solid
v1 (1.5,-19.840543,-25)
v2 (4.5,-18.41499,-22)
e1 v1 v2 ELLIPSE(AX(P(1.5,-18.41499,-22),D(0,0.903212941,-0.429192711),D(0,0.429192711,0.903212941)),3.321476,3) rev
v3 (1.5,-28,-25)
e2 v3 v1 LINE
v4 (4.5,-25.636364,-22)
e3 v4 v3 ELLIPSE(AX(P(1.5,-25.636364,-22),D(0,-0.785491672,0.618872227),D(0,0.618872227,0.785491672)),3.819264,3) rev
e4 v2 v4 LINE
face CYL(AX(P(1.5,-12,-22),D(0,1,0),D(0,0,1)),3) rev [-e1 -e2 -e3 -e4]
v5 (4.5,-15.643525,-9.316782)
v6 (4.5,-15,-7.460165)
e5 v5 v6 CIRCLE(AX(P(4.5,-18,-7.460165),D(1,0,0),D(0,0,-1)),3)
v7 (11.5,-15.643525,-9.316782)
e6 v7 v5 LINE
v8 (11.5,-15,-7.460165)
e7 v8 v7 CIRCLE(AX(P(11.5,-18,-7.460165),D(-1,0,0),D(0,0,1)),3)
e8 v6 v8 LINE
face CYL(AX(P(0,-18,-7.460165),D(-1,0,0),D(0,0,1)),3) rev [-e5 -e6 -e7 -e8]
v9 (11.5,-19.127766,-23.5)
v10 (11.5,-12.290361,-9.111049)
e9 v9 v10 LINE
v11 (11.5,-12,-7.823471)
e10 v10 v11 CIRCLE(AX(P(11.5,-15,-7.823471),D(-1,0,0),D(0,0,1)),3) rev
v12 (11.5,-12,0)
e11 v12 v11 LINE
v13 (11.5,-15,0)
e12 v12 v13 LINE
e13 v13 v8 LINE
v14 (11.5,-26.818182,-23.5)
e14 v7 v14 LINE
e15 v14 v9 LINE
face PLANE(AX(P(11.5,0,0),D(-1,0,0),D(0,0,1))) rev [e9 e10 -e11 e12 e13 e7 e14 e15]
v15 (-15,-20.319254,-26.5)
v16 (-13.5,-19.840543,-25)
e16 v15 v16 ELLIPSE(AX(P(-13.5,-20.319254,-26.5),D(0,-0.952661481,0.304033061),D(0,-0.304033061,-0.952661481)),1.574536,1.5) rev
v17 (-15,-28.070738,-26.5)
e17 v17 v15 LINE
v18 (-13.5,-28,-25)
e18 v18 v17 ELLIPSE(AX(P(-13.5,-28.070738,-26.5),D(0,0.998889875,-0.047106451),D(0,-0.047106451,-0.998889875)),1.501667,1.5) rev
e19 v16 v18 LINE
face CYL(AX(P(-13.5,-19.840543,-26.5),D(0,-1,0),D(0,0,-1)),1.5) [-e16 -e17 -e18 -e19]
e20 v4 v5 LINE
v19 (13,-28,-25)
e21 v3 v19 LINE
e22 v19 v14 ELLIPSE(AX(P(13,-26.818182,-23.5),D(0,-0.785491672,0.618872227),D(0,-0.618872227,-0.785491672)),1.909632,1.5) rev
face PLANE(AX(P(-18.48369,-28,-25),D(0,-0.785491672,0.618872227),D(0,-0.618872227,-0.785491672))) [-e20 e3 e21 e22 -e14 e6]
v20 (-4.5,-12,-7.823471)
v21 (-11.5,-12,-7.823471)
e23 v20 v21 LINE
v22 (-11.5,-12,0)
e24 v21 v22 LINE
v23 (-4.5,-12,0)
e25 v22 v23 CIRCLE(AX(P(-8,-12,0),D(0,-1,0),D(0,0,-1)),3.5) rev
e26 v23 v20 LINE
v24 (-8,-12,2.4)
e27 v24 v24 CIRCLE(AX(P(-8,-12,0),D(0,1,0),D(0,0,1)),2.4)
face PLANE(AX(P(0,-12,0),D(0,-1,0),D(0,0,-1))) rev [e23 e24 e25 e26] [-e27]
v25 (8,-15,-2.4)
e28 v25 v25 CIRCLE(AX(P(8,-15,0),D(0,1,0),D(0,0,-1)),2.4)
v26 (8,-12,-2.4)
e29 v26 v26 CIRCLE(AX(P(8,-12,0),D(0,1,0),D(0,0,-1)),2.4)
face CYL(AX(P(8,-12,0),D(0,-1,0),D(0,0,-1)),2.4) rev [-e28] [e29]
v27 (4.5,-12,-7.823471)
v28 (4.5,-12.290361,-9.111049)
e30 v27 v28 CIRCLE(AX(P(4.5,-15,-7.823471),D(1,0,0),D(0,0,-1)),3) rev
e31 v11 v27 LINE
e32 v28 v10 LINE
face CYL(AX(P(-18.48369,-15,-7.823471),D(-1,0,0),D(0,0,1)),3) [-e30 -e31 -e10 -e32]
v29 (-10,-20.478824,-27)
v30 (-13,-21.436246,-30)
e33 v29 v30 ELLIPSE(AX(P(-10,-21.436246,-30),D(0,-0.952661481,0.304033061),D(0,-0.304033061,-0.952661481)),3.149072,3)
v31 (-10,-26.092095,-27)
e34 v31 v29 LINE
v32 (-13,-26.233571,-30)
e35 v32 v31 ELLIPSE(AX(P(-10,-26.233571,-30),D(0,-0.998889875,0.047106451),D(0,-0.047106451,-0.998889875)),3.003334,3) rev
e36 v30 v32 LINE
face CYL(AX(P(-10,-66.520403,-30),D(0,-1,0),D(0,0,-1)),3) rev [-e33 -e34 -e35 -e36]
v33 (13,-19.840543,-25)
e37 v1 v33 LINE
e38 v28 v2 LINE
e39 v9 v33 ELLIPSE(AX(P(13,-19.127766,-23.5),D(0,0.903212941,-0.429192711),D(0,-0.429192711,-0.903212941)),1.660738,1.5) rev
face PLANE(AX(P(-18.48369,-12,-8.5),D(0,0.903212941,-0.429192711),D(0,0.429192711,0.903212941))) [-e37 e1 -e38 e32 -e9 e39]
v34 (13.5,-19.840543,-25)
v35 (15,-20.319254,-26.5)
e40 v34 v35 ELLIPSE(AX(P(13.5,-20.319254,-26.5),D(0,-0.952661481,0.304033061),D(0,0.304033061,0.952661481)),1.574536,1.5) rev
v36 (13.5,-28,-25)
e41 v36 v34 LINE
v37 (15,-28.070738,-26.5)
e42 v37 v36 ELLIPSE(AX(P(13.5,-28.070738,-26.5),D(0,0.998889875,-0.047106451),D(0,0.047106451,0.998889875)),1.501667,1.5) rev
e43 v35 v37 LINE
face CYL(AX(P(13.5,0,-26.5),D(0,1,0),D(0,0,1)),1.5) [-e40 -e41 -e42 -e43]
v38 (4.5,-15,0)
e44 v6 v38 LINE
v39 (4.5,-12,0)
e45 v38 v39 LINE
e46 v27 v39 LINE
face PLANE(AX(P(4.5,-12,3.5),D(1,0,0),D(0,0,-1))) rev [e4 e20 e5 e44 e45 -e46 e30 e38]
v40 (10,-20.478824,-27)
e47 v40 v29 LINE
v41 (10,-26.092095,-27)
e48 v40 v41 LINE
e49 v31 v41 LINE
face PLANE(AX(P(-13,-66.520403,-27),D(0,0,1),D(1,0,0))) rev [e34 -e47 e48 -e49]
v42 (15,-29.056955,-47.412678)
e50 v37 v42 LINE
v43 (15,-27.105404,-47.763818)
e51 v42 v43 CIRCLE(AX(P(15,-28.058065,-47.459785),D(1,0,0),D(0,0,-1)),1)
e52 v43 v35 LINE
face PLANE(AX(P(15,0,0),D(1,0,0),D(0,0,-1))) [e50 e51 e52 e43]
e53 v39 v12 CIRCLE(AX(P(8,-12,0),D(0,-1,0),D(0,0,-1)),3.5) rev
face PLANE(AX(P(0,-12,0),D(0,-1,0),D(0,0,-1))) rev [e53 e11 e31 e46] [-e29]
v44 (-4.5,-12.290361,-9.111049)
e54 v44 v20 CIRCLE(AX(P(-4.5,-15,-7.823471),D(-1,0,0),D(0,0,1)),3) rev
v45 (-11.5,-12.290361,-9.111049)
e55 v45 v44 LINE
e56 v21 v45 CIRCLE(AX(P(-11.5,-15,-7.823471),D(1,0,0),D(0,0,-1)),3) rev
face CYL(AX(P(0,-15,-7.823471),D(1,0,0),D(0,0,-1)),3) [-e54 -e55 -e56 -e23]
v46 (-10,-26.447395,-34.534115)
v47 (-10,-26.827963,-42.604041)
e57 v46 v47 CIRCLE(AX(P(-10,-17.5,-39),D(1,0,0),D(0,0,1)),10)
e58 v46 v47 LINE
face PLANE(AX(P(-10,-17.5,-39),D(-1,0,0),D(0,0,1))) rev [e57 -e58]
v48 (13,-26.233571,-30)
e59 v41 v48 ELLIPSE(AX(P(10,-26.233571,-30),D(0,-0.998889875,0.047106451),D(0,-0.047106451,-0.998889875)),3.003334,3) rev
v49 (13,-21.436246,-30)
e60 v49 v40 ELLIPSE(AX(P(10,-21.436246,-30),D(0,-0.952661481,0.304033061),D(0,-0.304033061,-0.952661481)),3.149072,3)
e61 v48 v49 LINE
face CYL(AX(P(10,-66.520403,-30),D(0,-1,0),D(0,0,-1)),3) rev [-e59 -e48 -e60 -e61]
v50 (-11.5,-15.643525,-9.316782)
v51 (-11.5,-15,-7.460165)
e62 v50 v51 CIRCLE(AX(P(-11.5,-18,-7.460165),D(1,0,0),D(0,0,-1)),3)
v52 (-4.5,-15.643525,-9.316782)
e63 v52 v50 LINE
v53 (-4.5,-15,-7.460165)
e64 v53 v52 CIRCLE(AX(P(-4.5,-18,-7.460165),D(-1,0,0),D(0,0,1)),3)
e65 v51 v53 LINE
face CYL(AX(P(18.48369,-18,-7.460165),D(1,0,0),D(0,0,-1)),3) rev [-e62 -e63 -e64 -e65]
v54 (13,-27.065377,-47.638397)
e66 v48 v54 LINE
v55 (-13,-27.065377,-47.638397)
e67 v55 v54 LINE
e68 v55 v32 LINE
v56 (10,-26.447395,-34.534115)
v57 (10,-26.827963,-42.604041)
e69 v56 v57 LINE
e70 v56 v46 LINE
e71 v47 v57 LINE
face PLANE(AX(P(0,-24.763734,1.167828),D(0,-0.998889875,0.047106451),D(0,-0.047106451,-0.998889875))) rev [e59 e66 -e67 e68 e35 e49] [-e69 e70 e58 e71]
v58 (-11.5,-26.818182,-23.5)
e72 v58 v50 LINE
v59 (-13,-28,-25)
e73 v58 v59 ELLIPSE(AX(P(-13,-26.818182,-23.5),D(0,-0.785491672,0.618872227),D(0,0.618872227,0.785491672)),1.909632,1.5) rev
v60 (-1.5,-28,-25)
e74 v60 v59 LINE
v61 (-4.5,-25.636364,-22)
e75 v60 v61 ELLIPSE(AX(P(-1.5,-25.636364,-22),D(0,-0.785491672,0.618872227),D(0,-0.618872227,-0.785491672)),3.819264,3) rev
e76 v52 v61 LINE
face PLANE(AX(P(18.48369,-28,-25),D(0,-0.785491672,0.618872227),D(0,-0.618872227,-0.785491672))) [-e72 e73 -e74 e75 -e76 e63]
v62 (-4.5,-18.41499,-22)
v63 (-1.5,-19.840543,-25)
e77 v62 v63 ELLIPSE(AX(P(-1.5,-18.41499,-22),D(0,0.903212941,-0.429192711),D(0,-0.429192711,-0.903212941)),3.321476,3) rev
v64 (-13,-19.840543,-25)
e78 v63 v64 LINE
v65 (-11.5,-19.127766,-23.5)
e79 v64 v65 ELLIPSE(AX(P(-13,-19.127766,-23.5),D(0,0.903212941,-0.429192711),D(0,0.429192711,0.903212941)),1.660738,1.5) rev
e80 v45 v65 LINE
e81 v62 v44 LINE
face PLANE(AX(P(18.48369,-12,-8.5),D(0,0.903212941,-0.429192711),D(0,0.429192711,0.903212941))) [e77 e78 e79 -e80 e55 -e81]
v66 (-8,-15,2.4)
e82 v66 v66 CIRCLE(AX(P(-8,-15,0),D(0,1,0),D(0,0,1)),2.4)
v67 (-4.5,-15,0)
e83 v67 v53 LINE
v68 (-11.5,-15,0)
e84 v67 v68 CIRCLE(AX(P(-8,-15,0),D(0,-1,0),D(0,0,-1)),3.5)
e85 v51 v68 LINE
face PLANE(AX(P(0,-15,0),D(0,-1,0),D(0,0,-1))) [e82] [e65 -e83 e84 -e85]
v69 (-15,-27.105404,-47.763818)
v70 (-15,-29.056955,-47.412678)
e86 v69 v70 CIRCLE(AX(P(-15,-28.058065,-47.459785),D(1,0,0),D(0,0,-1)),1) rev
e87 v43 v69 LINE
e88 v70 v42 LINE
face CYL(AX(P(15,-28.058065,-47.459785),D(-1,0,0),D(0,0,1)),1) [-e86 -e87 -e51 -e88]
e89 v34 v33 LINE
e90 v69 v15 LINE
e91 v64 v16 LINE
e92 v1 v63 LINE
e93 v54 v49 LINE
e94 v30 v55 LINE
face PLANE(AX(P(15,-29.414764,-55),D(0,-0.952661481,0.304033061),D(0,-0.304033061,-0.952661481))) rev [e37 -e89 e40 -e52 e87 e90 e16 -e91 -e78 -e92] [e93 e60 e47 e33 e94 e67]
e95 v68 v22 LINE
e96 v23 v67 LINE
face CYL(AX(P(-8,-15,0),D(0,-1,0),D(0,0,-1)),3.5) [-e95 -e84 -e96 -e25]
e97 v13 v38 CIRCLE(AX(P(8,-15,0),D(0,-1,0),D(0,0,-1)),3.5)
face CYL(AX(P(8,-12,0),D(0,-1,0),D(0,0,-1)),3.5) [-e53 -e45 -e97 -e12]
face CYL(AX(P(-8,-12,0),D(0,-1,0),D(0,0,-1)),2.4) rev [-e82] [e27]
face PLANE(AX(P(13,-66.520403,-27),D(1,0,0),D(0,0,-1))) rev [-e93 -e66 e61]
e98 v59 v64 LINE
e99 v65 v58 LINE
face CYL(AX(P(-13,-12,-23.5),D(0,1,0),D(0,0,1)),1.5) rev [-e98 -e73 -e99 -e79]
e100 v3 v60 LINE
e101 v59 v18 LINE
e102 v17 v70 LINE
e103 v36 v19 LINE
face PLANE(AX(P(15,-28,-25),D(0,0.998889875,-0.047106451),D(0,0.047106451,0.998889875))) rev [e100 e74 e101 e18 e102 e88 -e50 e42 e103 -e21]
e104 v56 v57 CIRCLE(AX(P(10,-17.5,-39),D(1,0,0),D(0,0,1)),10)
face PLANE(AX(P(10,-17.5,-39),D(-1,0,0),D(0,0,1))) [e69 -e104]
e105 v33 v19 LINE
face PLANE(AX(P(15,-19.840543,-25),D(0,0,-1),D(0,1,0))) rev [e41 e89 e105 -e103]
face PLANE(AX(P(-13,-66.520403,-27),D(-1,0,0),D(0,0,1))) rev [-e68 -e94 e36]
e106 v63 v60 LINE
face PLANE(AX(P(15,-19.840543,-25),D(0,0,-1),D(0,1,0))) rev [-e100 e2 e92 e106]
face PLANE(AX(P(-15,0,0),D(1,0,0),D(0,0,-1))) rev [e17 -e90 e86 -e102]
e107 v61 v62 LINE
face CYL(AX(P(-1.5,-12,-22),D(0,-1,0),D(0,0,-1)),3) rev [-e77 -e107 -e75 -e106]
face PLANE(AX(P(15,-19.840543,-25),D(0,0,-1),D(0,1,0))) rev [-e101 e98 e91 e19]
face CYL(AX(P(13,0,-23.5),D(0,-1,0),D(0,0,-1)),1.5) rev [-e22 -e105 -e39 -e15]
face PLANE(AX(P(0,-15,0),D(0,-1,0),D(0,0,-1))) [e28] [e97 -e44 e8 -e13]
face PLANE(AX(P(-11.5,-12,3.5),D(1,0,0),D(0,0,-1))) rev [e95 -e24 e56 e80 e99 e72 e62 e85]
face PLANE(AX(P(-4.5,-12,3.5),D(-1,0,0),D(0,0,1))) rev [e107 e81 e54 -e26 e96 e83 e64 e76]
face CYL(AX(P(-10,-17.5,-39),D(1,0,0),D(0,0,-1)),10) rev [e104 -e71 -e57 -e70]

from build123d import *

# Parameters (mm, degrees)
BOSS_EXTRUDE1_DEPTH   = 15
CUT_EXTRUDE1_REACH    = 66.15
SKETCH2_W             = 26
SKETCH2_H             = 30
SKETCH4_W             = 7
SKETCH4_H             = 12
SKETCH4_R             = 2.4
BOSS_EXTRUDE2_DEPTH   = 1.5
BOSS_EXTRUDE2_2_DEPTH = 1.5
BOSS_EXTRUDE3_DEPTH   = 7
BOSS_EXTRUDE4_DEPTH   = 7
FILLET1_R             = 3
FILLET2_R             = 1.5
FILLET3_R             = 1
FILLET4_RADIUS        = 3.5
FILLET4_LENGTH        = 3
FILLET5_RADIUS        = 3.5
FILLET5_LENGTH        = 3
SKETCH3_R             = 10
CUT_EXTRUDE2_DEPTH    = 10


with BuildPart() as part:
    # Sketch1 → Boss-Extrude1 (new, symmetric)
    with BuildSketch(Plane(origin=(0, 0, 0), x_dir=(0, 0, -1), z_dir=(1, 0, 0))):
        Polygon((25, -19.840542805), (25, -28), (55, -29.414764086), align=None)
    extrude(amount=BOSS_EXTRUDE1_DEPTH, both=True)

    # Cut-Extrude1: up to this plane
    cut_extrude1_end = Plane(origin=(0, -24.763733838, 1.167828043), z_dir=(0, -0.99888987496197, 0.0471064507096427))
    # Sketch2 → Cut-Extrude1 (cut, up to the surface)
    with BuildSketch(Plane(origin=(0, 0, 0), x_dir=(1, 0, 0), z_dir=(0, 1, 0)), mode=Mode.PRIVATE) as cut_extrude1_sk1:
        with Locations((0, 42)):
            Rectangle(SKETCH2_W, SKETCH2_H)
    cut_extrude1_tool1 = split(extrude(cut_extrude1_sk1.sketch, amount=-CUT_EXTRUDE1_REACH, mode=Mode.PRIVATE), bisect_by=cut_extrude1_end, keep=Keep.BOTH, mode=Mode.PRIVATE)
    add(cut_extrude1_tool1.solids().sort_by_distance((0, 0, -42))[0], mode=Mode.SUBTRACT)



with BuildPart() as body_2:
    # Sketch4 → Boss-Extrude2 (new, symmetric)
    with BuildSketch(Plane(origin=(0, -13.5, 0), x_dir=(1, 0, 0), z_dir=(0, 1, 0))):
        with Locations((8, 2.5)):
            Rectangle(SKETCH4_W, SKETCH4_H)
        with Locations(Location((8, 0, 0), (0, 0, 90))):
            Circle(SKETCH4_R, mode=Mode.SUBTRACT)
    extrude(amount=BOSS_EXTRUDE2_DEPTH, both=True)


with BuildPart() as body_3:
    # Sketch4 → Boss-Extrude2 2 (new, symmetric)
    with BuildSketch(Plane(origin=(0, -13.5, 0), x_dir=(1, 0, 0), z_dir=(0, 1, 0))):
        with Locations((-8, 2.5)):
            Rectangle(SKETCH4_W, SKETCH4_H)
        with Locations(Location((-8, 0, 0), (0, 0, 270))):
            Circle(SKETCH4_R, mode=Mode.SUBTRACT)
    extrude(amount=BOSS_EXTRUDE2_2_DEPTH, both=True)


with BuildPart() as part_1:
    add(part.part)

    add(body_2.part)  # Boss-Extrude3 merges body 2
    # Sketch5 → Boss-Extrude3 (add)
    with BuildSketch(Plane(origin=(11.5, 0, 0), x_dir=(0, 0, -1), z_dir=(1, 0, 0))):
        Polygon((8.5, -12), (8.5, -15), (25, -28), (25, -19.840542805), align=None)
    extrude(amount=-BOSS_EXTRUDE3_DEPTH)


    add(body_3.part)  # Boss-Extrude4 merges body 3
    # Sketch8 → Boss-Extrude4 (add)
    with BuildSketch(Plane.ZY.offset(11.5)):
        Polygon((-25, -28), (-8.5, -15), (-8.5, -12), (-25, -19.840542805), align=None)
    extrude(amount=-BOSS_EXTRUDE4_DEPTH)

    # Fillet1
    fillet1_edges = [part_1.edges().sort_by_distance(p)[0] for p in [
        (-8, -12, -8.5),
        (-4.5, -23.920271402, -25),
        (-13, -23.285459556, -27),
        (13, -23.285459556, -27),
        (8, -12, -8.5),
        (4.5, -23.920271402, -25),
        (8, -15, -8.5),
        (-8, -15, -8.5),
    ]]
    fillet(fillet1_edges, radius=FILLET1_R)

    # Fillet2
    # the kernel refuses this fillet: 1.5 mm, written as the material it adds along each edge
    with BuildSketch(Plane(origin=(-11.5, -16.090542805, -25), x_dir=(0, 0, 1), z_dir=(0, -1, 0))) as fillet2_piece_1_section:
        with BuildLine():
            CenterArc((FILLET2_R, FILLET2_R), FILLET2_R, 180, 90)
            Line((0, FILLET2_R), (0, 0))
            Line((0, 0), (FILLET2_R, 0))
        make_face()
    fillet2_piece_1 = extrude(amount=15.659457195, mode=Mode.PRIVATE)
    fillet2_piece_1 = split(fillet2_piece_1, bisect_by=Plane(origin=(-11.659708769, -19.629987495, -24.340243021), z_dir=(0, 0.9526614812535883, -0.30403306092548404)), keep=Keep.TOP, mode=Mode.PRIVATE)
    fillet2_piece_1 = split(fillet2_piece_1, bisect_by=Plane(origin=(-11.659708769, -19.543237279, -24.374336535), z_dir=(0, -0.9032129411473199, 0.4291927107302828)), keep=Keep.TOP, mode=Mode.PRIVATE)
    add(fillet2_piece_1)
    with BuildSketch(Plane(origin=(-11.5, -16.090542805, -25), x_dir=(0, 0, 1), z_dir=(0, -1, 0))) as fillet2_piece_2_section:
        with BuildLine():
            CenterArc((FILLET2_R, FILLET2_R), FILLET2_R, 180, 90)
            Line((0, FILLET2_R), (0, 0))
            Line((0, 0), (FILLET2_R, 0))
        make_face()
    fillet2_piece_2 = extrude(amount=15.659457195, mode=Mode.PRIVATE)
    fillet2_piece_2 = split(fillet2_piece_2, bisect_by=Plane(origin=(-11.843159529, -20.103961016, -25.825398338), z_dir=(0, -0.9526614812535883, 0.30403306092548404)), keep=Keep.TOP, mode=Mode.PRIVATE)
    fillet2_piece_2 = split(fillet2_piece_2, bisect_by=Plane(origin=(-11.843159529, -20.428696748, -26.237738291), z_dir=(0, -0.9032129411473199, 0.4291927107302828)), keep=Keep.TOP, mode=Mode.PRIVATE)
    fillet2_piece_2 = split(fillet2_piece_2, bisect_by=Plane(origin=(-11.843159529, -26.204484919, -22.721077013), z_dir=(0, 0.7854916722275349, -0.6188722266035137)), keep=Keep.TOP, mode=Mode.PRIVATE)
    fillet2_piece_2 = split(fillet2_piece_2, bisect_by=Plane(origin=(-11.843159529, -27.974843393, -24.466555432), z_dir=(0, 0.99888987496197, -0.04710645070964269)), keep=Keep.TOP, mode=Mode.PRIVATE)
    add(fillet2_piece_2)
    with BuildSketch(Plane(origin=(11.5, -31.75, -25), x_dir=(1, 0, 0), z_dir=(0, 1, 0))) as fillet2_piece_3_section:
        with BuildLine():
            CenterArc((FILLET2_R, -FILLET2_R), FILLET2_R, 90, 90)
            Line((0, -FILLET2_R), (0, 0))
            Line((0, 0), (FILLET2_R, 0))
        make_face()
    fillet2_piece_3 = extrude(amount=15.659457195, mode=Mode.PRIVATE)
    fillet2_piece_3 = split(fillet2_piece_3, bisect_by=Plane(origin=(11.843159529, -20.103961016, -25.825398338), z_dir=(0, -0.9526614812535883, 0.30403306092548404)), keep=Keep.TOP, mode=Mode.PRIVATE)
    fillet2_piece_3 = split(fillet2_piece_3, bisect_by=Plane(origin=(11.843159529, -27.974843393, -24.466555432), z_dir=(0, 0.99888987496197, -0.04710645070964269)), keep=Keep.TOP, mode=Mode.PRIVATE)
    fillet2_piece_3 = split(fillet2_piece_3, bisect_by=Plane(origin=(11.843159529, -26.204484919, -22.721077013), z_dir=(0, 0.7854916722275349, -0.6188722266035137)), keep=Keep.TOP, mode=Mode.PRIVATE)
    fillet2_piece_3 = split(fillet2_piece_3, bisect_by=Plane(origin=(11.843159529, -20.428696748, -26.237738291), z_dir=(0, -0.9032129411473199, 0.4291927107302828)), keep=Keep.TOP, mode=Mode.PRIVATE)
    add(fillet2_piece_3)
    with BuildSketch(Plane(origin=(11.5, -31.75, -25), x_dir=(1, 0, 0), z_dir=(0, 1, 0))) as fillet2_piece_4_section:
        with BuildLine():
            CenterArc((FILLET2_R, -FILLET2_R), FILLET2_R, 90, 90)
            Line((0, -FILLET2_R), (0, 0))
            Line((0, 0), (FILLET2_R, 0))
        make_face()
    fillet2_piece_4 = extrude(amount=15.659457195, mode=Mode.PRIVATE)
    fillet2_piece_4 = split(fillet2_piece_4, bisect_by=Plane(origin=(11.659708769, -19.629987495, -24.340243021), z_dir=(0, 0.9526614812535883, -0.30403306092548404)), keep=Keep.TOP, mode=Mode.PRIVATE)
    fillet2_piece_4 = split(fillet2_piece_4, bisect_by=Plane(origin=(11.659708769, -19.543237279, -24.374336535), z_dir=(0, -0.9032129411473199, 0.4291927107302828)), keep=Keep.TOP, mode=Mode.PRIVATE)
    add(fillet2_piece_4)
    # the kernel refuses this fillet: 1.5 mm, written as the material it takes off along each edge
    with BuildSketch(Plane(origin=(-15, -16.090542805, -25), x_dir=(1, 0, 0), z_dir=(0, -1, 0)), Plane(origin=(15, -16.090542805, -25), x_dir=(0, 0, -1), z_dir=(0, -1, 0))) as fillet2_2_piece_1:
        with BuildLine():
            CenterArc((FILLET2_R, -FILLET2_R), FILLET2_R, 90, 90)
            Line((0, -FILLET2_R), (0, 0))
            Line((0, 0), (FILLET2_R, 0))
        make_face()
    extrude(amount=15.659457195, mode=Mode.SUBTRACT)

    # Fillet3
    fillet3_edges = [part_1.edges().sort_by_distance(p)[0] for p in [
        (0, -29.414764086, -55),
    ]]
    fillet(fillet3_edges, radius=FILLET3_R)

    # Fillet4: full round fillet: the end face becomes a half cylinder, R = half its width
    fillet4_face = Plane((8, -13.5, 3.5), x_dir=(0, 1, 0), z_dir=(0, 0, 1))  # on the end face: x along it, z out of the body
    fillet4_slab = fillet4_face.offset(-FILLET4_RADIUS / 2) * Box(FILLET4_LENGTH, 2 * FILLET4_RADIUS, FILLET4_RADIUS, mode=Mode.PRIVATE)  # the body's end, R deep
    fillet4_round = Plane((8, -13.5, 0), x_dir=(0, 0, 1), z_dir=(0, 1, 0)) * Cylinder(FILLET4_RADIUS, FILLET4_LENGTH, mode=Mode.PRIVATE)  # its axis R under the face
    add(fillet4_slab - fillet4_round, mode=Mode.SUBTRACT)

    # Fillet5: full round fillet: the end face becomes a half cylinder, R = half its width
    fillet5_face = Plane((-8, -13.5, 3.5), x_dir=(0, 1, 0), z_dir=(0, 0, 1))  # on the end face: x along it, z out of the body
    fillet5_slab = fillet5_face.offset(-FILLET5_RADIUS / 2) * Box(FILLET5_LENGTH, 2 * FILLET5_RADIUS, FILLET5_RADIUS, mode=Mode.PRIVATE)  # the body's end, R deep
    fillet5_round = Plane((-8, -13.5, 0), x_dir=(0, 0, 1), z_dir=(0, 1, 0)) * Cylinder(FILLET5_RADIUS, FILLET5_LENGTH, mode=Mode.PRIVATE)  # its axis R under the face
    add(fillet5_slab - fillet5_round, mode=Mode.SUBTRACT)

    # Sketch3 → Cut-Extrude2 (cut, symmetric)
    with BuildSketch(Plane(origin=(0, 0, 0), x_dir=(0, 0, -1), z_dir=(1, 0, 0))):
        with Locations((39, -17.5)):
            Circle(SKETCH3_R)
    extrude(amount=CUT_EXTRUDE2_DEPTH, both=True, mode=Mode.SUBTRACT)


solid = part_1.part
